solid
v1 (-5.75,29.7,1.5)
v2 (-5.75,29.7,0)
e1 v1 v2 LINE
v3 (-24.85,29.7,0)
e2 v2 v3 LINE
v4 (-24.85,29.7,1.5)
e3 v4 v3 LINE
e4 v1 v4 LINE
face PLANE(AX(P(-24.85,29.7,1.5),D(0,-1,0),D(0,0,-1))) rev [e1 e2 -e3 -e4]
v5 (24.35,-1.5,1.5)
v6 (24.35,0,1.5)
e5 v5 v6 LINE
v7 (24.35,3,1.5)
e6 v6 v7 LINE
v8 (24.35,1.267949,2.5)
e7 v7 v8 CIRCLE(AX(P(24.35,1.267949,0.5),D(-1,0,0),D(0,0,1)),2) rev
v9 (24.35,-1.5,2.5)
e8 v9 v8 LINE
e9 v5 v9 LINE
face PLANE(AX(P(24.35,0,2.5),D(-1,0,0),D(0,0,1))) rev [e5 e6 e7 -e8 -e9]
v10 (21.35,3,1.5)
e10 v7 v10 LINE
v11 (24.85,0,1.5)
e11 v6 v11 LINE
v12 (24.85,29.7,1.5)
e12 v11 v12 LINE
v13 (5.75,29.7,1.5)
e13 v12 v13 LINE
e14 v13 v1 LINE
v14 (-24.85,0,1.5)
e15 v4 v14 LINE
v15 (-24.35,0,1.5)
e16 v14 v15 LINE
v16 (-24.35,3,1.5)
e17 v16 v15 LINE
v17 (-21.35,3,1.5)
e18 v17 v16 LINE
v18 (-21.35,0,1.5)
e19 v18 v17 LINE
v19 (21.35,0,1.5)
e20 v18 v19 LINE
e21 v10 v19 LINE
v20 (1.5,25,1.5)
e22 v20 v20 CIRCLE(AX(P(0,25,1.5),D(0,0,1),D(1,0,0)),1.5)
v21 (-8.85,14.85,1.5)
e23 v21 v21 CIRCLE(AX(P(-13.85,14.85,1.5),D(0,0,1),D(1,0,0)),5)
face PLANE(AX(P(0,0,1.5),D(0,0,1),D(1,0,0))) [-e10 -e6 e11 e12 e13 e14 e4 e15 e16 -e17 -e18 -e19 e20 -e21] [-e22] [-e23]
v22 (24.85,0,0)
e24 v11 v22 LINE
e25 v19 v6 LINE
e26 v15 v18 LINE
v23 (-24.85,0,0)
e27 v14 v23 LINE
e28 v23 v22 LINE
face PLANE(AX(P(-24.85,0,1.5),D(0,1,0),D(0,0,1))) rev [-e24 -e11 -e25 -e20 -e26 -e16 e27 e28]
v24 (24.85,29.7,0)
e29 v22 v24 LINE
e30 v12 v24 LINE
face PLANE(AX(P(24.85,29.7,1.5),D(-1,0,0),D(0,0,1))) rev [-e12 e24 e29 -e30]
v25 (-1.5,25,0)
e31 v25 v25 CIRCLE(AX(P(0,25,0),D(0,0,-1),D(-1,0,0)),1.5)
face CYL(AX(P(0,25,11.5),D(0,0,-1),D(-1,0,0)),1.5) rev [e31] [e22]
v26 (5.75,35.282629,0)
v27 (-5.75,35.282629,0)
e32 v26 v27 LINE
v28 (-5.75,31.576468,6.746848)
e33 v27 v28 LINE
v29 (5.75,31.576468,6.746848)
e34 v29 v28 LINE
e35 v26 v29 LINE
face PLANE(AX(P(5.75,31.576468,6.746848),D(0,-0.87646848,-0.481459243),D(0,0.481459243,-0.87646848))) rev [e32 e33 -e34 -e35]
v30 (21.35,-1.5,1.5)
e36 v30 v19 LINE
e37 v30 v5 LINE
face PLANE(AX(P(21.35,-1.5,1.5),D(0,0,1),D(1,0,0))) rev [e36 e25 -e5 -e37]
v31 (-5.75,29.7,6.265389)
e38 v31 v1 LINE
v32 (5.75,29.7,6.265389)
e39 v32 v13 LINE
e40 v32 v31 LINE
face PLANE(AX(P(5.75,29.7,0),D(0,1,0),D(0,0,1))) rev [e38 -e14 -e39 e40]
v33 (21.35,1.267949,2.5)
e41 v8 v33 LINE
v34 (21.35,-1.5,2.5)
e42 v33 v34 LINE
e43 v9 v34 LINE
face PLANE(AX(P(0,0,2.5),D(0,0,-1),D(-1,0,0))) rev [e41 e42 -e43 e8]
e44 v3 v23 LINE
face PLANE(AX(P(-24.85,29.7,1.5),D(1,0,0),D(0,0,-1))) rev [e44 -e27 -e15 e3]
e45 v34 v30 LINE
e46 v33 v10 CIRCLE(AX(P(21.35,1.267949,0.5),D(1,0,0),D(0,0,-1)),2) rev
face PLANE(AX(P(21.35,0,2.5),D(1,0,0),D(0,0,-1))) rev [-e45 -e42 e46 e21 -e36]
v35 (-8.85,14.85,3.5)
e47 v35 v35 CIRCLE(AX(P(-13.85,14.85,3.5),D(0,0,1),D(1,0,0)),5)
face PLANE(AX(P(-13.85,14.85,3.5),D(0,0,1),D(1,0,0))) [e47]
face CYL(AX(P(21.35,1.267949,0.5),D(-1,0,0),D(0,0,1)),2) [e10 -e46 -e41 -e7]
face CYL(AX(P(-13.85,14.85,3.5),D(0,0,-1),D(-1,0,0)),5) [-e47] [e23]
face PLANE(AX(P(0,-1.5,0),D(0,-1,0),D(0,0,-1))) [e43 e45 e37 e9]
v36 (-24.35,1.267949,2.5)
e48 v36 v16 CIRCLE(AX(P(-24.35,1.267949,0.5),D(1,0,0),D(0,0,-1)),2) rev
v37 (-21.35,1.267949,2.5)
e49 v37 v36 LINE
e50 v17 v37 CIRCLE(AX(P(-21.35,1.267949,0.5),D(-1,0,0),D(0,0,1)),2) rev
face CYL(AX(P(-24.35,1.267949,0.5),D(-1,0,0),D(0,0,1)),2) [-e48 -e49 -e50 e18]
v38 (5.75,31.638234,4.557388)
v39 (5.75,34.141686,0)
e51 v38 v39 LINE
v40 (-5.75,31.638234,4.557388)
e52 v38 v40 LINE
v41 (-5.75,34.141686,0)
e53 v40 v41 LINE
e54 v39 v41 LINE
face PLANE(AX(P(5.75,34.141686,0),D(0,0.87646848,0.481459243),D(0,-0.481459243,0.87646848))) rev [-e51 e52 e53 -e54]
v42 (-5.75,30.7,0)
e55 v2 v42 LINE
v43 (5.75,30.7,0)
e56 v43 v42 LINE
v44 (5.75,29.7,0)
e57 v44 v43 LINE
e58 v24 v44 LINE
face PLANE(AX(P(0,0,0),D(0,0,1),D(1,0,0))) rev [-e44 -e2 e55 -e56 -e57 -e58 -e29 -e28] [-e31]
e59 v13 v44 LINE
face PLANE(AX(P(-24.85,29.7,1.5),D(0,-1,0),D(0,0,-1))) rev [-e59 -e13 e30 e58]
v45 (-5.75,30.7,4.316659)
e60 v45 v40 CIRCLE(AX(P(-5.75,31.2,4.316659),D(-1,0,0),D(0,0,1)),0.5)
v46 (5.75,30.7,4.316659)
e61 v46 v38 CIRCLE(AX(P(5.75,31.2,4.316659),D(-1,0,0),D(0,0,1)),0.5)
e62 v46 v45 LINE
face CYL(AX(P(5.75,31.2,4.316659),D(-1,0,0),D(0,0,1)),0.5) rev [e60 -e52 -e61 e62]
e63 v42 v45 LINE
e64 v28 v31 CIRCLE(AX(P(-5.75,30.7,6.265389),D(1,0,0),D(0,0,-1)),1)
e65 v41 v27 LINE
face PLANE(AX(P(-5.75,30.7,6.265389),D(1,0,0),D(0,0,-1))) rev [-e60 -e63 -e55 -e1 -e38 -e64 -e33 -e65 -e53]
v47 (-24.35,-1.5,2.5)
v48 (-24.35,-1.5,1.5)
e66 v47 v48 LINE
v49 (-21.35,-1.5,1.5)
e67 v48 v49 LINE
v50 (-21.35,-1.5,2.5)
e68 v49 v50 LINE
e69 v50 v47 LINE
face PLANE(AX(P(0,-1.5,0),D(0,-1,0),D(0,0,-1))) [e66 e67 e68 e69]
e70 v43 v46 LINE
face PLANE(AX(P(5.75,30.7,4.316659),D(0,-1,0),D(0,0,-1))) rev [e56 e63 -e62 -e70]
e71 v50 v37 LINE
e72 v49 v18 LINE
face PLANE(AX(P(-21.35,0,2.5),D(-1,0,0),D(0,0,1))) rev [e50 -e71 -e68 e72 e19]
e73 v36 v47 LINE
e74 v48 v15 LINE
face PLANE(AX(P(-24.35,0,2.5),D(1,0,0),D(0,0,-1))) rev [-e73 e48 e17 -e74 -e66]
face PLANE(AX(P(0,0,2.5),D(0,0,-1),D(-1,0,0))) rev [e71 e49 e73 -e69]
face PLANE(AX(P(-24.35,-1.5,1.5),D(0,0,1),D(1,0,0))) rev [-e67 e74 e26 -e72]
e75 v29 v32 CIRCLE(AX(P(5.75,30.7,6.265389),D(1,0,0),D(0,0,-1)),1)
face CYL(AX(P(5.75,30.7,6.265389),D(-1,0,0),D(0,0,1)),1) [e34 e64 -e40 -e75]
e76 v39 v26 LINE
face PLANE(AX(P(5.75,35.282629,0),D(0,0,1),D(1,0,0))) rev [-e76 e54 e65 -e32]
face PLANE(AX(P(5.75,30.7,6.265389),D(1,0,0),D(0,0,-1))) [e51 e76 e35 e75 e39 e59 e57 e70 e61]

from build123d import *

# Parameters (mm, degrees)
CROQUIS1_W              = 49.7
CROQUIS1_H              = 29.7
SALIENTE_EXTRUIR1_DEPTH = 1.5
CROQUIS2_R              = 5
SALIENTE_EXTRUIR2_DEPTH = 2
CROQUIS3_W              = 3
CROQUIS3_H              = 3
SALIENTE_EXTRUIR3_DEPTH = 1
CROQUIS4_W              = 3
CROQUIS4_H              = 1
SALIENTE_EXTRUIR4_DEPTH = 1.5
REDONDEO1_R             = 2
SALIENTE_EXTRUIR5_DEPTH = 5.75
CROQUIS7_R              = 1.5
CORTAR_EXTRUIR1_DEPTH   = 11.5


with BuildPart() as part:
    # Croquis1 → Saliente-Extruir1 (new body)
    with BuildSketch(Plane.XY):
        with Locations((0, 14.85)):
            Rectangle(CROQUIS1_W, CROQUIS1_H)
    extrude(amount=SALIENTE_EXTRUIR1_DEPTH)

    # Croquis2 → Saliente-Extruir2 (add)
    with BuildSketch(Plane.XY.offset(1.5)):
        with Locations((-13.85, 14.85)):
            Circle(CROQUIS2_R)
    extrude(amount=SALIENTE_EXTRUIR2_DEPTH)

    # Croquis3 → Saliente-Extruir3 (add)
    with BuildSketch(Plane.XY.offset(1.5)):
        with Locations((-22.85, 1.5)):
            Rectangle(CROQUIS3_W, CROQUIS3_H)
        with Locations((22.85, 1.5)):
            Rectangle(CROQUIS3_W, CROQUIS3_H)
    extrude(amount=SALIENTE_EXTRUIR3_DEPTH)

    # Croquis4 → Saliente-Extruir4 (add)
    with BuildSketch(Plane.XZ):
        with Locations((-22.85, 2)):
            Rectangle(CROQUIS4_W, CROQUIS4_H)
        with Locations((22.85, 2)):
            Rectangle(CROQUIS4_W, CROQUIS4_H)
    extrude(amount=SALIENTE_EXTRUIR4_DEPTH)

    # Redondeo1
    # the kernel refuses this fillet: 2 mm, written as the material it takes off along each edge
    with BuildSketch(Plane(origin=(-17.019872981, 3, 2.5), x_dir=(0, -1, 0), z_dir=(-1, 0, 0)), Plane(origin=(28.680127019, 3, 2.5), x_dir=(0, -1, 0), z_dir=(-1, 0, 0))) as redondeo1_piece_1:
        with BuildLine():
            CenterArc((1.732050808, -2), REDONDEO1_R, 90, 60)
            Line((0, -1), (-0.034641016, -0.98))
            ThreePointArc((-0.034641016, -0.98), (-0.04, -0.5), (-0.04, 0))
            Line((-0.04, 0), (0, 0.04))
            Line((0, 0.04), (1.732050808, 0.04))
            Line((1.732050808, 0.04), (1.732050808, 0))
        make_face()
    extrude(amount=11.660254038, mode=Mode.SUBTRACT)

    # Croquis6 → Saliente-Extruir5 (add, symmetric)
    with BuildSketch(Plane(origin=(0, 0, 0), x_dir=(0, 0, -1), z_dir=(1, 0, 0))):
        with BuildLine():
            Line((0, 29.7), (-6.265388986, 29.7))
            ThreePointArc((-6.265388986, 29.7), (-7.234013908, 30.451472819), (-6.746848229, 31.57646848))
            Line((-6.746848229, 31.57646848), (0, 35.282628504))
            Line((0, 35.282628504), (0, 34.141686163))
            Line((0, 34.141686163), (-4.557388257, 31.63823424))
            ThreePointArc((-4.557388257, 31.63823424), (-4.800971096, 31.075736409), (-4.316658635, 30.7))
            Line((-4.316658635, 30.7), (0, 30.7))
            Line((0, 30.7), (0, 29.7))
        make_face()
    extrude(amount=SALIENTE_EXTRUIR5_DEPTH, both=True)

    # Croquis7 → Cortar-Extruir1 (cut)
    with BuildSketch(Plane(origin=(0, 0, 0), x_dir=(-1, 0, 0), z_dir=(0, 0, -1))):
        with Locations((0, 25)):
            Circle(CROQUIS7_R)
    extrude(amount=-CORTAR_EXTRUIR1_DEPTH, mode=Mode.SUBTRACT)


solid = part.part
